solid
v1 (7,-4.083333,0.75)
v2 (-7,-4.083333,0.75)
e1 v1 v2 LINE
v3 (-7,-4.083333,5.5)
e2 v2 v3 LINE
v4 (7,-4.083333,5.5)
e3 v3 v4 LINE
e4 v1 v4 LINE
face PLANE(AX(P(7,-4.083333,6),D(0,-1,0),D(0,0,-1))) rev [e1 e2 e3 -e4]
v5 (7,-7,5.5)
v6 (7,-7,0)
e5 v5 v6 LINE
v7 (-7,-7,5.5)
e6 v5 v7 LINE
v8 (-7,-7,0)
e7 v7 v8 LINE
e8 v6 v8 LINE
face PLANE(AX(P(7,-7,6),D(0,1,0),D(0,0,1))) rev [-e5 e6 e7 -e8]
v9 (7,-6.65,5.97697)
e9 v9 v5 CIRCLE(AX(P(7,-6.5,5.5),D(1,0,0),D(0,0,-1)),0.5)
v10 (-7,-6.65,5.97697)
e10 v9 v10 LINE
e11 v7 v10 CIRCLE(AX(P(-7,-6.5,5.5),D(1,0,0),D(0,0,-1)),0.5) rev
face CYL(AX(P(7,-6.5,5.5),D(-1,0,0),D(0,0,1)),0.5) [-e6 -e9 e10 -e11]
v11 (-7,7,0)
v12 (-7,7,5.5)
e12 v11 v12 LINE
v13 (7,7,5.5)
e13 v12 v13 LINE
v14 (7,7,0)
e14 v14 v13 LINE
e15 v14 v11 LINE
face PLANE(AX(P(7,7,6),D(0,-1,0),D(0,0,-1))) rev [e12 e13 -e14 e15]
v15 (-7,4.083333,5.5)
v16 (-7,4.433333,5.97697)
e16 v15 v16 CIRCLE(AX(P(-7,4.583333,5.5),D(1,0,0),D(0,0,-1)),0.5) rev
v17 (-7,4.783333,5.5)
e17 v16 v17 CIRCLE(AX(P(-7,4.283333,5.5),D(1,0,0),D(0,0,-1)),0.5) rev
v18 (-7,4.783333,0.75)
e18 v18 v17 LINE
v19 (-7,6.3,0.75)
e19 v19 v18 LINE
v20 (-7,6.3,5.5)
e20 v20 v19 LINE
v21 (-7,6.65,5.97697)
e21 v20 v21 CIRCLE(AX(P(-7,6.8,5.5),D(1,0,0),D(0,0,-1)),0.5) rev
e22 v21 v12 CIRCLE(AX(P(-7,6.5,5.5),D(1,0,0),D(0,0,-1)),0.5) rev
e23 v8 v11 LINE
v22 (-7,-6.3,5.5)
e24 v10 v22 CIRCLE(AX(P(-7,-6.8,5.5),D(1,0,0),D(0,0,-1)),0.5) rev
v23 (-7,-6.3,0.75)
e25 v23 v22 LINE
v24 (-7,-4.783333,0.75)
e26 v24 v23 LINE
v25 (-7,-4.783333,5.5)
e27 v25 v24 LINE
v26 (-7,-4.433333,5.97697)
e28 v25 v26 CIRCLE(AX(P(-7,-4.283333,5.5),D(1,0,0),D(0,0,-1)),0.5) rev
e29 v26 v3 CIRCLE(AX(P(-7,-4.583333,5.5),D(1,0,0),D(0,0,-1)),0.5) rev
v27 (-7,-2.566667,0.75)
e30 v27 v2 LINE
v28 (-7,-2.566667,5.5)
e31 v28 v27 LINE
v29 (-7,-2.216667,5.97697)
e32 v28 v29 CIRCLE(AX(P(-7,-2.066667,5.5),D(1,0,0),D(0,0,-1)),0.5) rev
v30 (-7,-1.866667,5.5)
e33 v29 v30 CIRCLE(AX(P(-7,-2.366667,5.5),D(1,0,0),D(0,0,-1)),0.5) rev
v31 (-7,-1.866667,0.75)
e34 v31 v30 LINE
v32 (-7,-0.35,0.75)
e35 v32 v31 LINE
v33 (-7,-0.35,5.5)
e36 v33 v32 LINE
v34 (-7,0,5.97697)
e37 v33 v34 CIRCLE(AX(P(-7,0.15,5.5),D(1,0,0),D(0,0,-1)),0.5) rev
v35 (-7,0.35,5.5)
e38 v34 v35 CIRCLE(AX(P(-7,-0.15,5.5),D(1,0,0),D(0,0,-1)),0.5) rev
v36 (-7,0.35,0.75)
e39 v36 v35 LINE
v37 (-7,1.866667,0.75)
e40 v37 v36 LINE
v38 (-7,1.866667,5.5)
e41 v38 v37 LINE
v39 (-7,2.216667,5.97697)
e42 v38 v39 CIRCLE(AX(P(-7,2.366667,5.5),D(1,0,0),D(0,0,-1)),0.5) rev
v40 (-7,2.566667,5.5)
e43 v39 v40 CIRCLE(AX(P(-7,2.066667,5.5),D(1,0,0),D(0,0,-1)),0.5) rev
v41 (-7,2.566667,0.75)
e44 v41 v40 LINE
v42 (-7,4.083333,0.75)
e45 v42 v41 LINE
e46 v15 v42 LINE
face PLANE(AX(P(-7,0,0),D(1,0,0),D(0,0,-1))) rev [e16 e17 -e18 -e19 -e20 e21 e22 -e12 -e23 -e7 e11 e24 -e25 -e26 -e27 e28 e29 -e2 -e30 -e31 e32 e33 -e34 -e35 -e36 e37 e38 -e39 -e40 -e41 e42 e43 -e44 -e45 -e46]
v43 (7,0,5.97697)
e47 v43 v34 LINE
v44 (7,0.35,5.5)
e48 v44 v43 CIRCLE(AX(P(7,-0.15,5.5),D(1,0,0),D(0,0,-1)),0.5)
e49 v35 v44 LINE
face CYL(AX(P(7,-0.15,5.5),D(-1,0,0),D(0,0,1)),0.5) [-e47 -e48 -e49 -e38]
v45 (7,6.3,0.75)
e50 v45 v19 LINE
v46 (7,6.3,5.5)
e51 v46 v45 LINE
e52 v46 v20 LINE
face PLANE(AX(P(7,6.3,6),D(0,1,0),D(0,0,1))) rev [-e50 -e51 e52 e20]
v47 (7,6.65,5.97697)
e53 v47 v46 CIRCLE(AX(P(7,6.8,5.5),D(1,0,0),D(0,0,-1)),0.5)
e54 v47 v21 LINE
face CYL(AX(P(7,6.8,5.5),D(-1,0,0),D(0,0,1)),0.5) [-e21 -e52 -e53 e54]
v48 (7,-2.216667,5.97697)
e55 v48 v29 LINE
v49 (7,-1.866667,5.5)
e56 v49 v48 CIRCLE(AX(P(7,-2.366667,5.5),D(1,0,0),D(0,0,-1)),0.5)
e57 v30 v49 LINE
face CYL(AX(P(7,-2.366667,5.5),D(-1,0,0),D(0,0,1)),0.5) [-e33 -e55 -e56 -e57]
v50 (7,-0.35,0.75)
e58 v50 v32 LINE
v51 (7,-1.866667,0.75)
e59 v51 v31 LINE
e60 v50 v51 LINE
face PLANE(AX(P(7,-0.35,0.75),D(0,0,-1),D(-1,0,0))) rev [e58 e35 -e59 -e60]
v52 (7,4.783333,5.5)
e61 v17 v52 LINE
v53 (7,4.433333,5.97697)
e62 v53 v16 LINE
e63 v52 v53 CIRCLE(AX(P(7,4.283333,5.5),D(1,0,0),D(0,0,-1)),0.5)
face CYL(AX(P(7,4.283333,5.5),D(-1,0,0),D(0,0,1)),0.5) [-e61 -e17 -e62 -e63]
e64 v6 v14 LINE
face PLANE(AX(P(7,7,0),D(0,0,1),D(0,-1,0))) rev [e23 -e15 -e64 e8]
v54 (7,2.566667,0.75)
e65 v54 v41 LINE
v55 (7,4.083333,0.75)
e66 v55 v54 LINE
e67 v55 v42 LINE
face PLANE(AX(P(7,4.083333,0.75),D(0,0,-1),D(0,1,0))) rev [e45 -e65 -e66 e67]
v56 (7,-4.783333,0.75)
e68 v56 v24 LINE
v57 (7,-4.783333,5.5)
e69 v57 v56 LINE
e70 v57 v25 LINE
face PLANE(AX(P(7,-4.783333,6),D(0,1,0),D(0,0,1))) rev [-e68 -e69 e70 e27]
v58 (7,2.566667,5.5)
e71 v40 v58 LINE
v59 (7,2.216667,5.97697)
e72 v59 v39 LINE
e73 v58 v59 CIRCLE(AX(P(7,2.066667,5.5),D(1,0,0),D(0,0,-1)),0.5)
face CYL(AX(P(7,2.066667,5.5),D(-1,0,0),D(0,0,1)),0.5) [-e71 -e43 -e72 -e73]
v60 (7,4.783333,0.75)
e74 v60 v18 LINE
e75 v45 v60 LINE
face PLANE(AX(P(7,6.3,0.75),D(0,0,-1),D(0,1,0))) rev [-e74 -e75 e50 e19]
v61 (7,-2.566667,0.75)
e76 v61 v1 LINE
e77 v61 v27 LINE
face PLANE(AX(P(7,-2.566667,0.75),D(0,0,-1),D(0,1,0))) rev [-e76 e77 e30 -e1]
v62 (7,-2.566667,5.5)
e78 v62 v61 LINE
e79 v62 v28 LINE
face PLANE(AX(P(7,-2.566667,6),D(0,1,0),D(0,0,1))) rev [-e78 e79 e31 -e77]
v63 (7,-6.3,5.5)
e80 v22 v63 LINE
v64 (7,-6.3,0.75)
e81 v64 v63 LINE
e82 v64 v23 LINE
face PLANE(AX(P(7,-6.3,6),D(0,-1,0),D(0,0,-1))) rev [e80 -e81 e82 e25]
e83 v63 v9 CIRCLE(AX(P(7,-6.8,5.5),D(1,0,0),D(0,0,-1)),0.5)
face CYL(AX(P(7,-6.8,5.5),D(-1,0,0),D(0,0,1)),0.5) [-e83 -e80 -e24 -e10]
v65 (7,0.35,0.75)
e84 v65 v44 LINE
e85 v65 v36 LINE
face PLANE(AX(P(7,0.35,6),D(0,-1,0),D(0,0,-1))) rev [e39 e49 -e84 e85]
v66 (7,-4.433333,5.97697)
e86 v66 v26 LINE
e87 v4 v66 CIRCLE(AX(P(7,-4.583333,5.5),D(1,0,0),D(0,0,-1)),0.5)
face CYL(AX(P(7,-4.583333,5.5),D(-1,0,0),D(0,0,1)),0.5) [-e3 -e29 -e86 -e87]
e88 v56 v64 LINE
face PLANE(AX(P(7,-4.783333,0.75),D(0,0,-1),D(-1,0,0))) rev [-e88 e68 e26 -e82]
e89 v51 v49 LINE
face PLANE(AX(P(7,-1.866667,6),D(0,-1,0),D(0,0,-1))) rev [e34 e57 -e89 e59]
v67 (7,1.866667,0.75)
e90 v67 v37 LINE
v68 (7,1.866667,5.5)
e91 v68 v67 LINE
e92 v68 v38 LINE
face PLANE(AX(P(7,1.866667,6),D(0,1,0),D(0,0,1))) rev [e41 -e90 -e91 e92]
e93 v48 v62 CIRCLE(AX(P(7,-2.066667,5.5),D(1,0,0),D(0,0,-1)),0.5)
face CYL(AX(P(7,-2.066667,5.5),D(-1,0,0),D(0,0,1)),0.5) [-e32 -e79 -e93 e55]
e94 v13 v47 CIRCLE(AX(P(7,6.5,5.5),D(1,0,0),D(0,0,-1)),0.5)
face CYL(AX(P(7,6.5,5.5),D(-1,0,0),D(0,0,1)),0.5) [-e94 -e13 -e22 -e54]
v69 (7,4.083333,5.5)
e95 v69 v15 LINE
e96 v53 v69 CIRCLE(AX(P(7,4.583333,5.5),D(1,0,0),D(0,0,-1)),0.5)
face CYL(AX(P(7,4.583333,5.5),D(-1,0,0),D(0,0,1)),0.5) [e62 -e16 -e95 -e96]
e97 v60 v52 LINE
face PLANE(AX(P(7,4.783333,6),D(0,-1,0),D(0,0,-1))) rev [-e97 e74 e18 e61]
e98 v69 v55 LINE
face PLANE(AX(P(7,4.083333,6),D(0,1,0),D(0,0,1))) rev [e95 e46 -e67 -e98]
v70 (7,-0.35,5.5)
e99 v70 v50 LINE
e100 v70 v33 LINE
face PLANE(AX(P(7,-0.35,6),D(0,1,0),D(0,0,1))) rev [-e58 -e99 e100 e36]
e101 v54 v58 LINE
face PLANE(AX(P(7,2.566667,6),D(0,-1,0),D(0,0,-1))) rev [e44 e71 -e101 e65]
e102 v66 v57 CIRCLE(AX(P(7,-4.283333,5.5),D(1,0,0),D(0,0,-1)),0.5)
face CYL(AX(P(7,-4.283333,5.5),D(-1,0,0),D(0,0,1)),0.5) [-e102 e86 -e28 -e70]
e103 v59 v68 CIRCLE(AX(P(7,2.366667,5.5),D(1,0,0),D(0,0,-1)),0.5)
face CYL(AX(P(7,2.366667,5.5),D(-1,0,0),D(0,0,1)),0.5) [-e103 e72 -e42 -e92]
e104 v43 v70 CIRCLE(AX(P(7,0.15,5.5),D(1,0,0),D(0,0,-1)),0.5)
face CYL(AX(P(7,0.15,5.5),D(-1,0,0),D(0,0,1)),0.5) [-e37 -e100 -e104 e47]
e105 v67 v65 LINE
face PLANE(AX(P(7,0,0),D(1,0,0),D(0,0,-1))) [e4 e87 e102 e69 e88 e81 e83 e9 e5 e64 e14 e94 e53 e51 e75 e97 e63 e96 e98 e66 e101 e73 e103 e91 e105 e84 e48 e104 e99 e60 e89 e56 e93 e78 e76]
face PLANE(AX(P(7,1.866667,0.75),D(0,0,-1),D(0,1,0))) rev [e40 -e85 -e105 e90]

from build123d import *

# Parameters (mm, degrees)
BOSS_EXTRUDE1_DEPTH = 7
FILLET1_R           = 0.5


with BuildPart() as part:
    # Sketch1 → Boss-Extrude1 (new, symmetric)
    with BuildSketch(Plane(origin=(0, 0, 0), x_dir=(0, 0, -1), z_dir=(1, 0, 0))):
        Polygon((-6, 4.783333333), (-6, 4.083333333), (-0.75, 4.083333333), (-0.75, 2.566666667), (-6, 2.566666667), (-6, 1.866666667), (-0.75, 1.866666667), (-0.75, 0.35), (-6, 0.35), (-6, -0.35), (-0.75, -0.35), (-0.75, -1.866666667), (-6, -1.866666667), (-6, -2.566666667), (-0.75, -2.566666667), (-0.75, -4.083333333), (-6, -4.083333333), (-6, -4.783333333), (-0.75, -4.783333333), (-0.75, -6.3), (-6, -6.3), (-6, -7), (0, -7), (0, -6.3), (0, -4.783333333), (0, -4.083333333), (0, -2.566666667), (0, -1.866666667), (0, -0.35), (0, 0.35), (0, 1.866666667), (0, 2.566666667), (0, 4.083333333), (0, 4.783333333), (0, 6.3), (0, 7), (-6, 7), (-6, 6.3), (-0.75, 6.3), (-0.75, 4.783333333), align=None)
    extrude(amount=BOSS_EXTRUDE1_DEPTH, both=True)

    # Fillet1
    # the kernel refuses this fillet: 0.5 mm, written as the material it takes off along each edge
    with BuildSketch(Plane(origin=(-8.25, -7, 6), x_dir=(0, 0, -1), z_dir=(1, 0, 0)), Plane(origin=(-8.25, -6.3, 6), x_dir=(0, -1, 0), z_dir=(1, 0, 0)), Plane(origin=(-8.25, -4.783333333, 6), x_dir=(0, 0, -1), z_dir=(1, 0, 0)), Plane(origin=(-8.25, -4.083333333, 6), x_dir=(0, -1, 0), z_dir=(1, 0, 0)), Plane(origin=(-8.25, -2.566666667, 6), x_dir=(0, 0, -1), z_dir=(1, 0, 0)), Plane(origin=(-8.25, -1.866666667, 6), x_dir=(0, -1, 0), z_dir=(1, 0, 0)), Plane(origin=(-8.25, -0.35, 6), x_dir=(0, 0, -1), z_dir=(1, 0, 0)), Plane(origin=(-8.25, 0.35, 6), x_dir=(0, -1, 0), z_dir=(1, 0, 0)), Plane(origin=(-8.25, 1.866666667, 6), x_dir=(0, 0, -1), z_dir=(1, 0, 0)), Plane(origin=(-8.25, 2.566666667, 6), x_dir=(0, -1, 0), z_dir=(1, 0, 0)), Plane(origin=(-8.25, 6.3, 6), x_dir=(0, 0, -1), z_dir=(1, 0, 0)), Plane(origin=(-8.25, 7, 6), x_dir=(0, -1, 0), z_dir=(1, 0, 0))) as fillet1_piece_1:
        with BuildLine():
            CenterArc((FILLET1_R, FILLET1_R), FILLET1_R, 180, 90)
            Line((0, FILLET1_R), (0, 0))
            Line((0, 0), (FILLET1_R, 0))
        make_face()
    extrude(amount=16.5, mode=Mode.SUBTRACT)
    with BuildSketch(Plane(origin=(-8.25, 4.083333333, 6), x_dir=(0, 1, 0), z_dir=(1, 0, 0)), Plane(origin=(8.25, 4.783333333, 6), x_dir=(0, -1, 0), z_dir=(-1, 0, 0))) as fillet1_piece_2:
        with BuildLine():
            CenterArc((FILLET1_R, -FILLET1_R), FILLET1_R, 90, 90)
            Line((0, -FILLET1_R), (0, 0))
            Line((0, 0), (FILLET1_R, 0))
        make_face()
    extrude(amount=16.5, mode=Mode.SUBTRACT)


solid = part.part
